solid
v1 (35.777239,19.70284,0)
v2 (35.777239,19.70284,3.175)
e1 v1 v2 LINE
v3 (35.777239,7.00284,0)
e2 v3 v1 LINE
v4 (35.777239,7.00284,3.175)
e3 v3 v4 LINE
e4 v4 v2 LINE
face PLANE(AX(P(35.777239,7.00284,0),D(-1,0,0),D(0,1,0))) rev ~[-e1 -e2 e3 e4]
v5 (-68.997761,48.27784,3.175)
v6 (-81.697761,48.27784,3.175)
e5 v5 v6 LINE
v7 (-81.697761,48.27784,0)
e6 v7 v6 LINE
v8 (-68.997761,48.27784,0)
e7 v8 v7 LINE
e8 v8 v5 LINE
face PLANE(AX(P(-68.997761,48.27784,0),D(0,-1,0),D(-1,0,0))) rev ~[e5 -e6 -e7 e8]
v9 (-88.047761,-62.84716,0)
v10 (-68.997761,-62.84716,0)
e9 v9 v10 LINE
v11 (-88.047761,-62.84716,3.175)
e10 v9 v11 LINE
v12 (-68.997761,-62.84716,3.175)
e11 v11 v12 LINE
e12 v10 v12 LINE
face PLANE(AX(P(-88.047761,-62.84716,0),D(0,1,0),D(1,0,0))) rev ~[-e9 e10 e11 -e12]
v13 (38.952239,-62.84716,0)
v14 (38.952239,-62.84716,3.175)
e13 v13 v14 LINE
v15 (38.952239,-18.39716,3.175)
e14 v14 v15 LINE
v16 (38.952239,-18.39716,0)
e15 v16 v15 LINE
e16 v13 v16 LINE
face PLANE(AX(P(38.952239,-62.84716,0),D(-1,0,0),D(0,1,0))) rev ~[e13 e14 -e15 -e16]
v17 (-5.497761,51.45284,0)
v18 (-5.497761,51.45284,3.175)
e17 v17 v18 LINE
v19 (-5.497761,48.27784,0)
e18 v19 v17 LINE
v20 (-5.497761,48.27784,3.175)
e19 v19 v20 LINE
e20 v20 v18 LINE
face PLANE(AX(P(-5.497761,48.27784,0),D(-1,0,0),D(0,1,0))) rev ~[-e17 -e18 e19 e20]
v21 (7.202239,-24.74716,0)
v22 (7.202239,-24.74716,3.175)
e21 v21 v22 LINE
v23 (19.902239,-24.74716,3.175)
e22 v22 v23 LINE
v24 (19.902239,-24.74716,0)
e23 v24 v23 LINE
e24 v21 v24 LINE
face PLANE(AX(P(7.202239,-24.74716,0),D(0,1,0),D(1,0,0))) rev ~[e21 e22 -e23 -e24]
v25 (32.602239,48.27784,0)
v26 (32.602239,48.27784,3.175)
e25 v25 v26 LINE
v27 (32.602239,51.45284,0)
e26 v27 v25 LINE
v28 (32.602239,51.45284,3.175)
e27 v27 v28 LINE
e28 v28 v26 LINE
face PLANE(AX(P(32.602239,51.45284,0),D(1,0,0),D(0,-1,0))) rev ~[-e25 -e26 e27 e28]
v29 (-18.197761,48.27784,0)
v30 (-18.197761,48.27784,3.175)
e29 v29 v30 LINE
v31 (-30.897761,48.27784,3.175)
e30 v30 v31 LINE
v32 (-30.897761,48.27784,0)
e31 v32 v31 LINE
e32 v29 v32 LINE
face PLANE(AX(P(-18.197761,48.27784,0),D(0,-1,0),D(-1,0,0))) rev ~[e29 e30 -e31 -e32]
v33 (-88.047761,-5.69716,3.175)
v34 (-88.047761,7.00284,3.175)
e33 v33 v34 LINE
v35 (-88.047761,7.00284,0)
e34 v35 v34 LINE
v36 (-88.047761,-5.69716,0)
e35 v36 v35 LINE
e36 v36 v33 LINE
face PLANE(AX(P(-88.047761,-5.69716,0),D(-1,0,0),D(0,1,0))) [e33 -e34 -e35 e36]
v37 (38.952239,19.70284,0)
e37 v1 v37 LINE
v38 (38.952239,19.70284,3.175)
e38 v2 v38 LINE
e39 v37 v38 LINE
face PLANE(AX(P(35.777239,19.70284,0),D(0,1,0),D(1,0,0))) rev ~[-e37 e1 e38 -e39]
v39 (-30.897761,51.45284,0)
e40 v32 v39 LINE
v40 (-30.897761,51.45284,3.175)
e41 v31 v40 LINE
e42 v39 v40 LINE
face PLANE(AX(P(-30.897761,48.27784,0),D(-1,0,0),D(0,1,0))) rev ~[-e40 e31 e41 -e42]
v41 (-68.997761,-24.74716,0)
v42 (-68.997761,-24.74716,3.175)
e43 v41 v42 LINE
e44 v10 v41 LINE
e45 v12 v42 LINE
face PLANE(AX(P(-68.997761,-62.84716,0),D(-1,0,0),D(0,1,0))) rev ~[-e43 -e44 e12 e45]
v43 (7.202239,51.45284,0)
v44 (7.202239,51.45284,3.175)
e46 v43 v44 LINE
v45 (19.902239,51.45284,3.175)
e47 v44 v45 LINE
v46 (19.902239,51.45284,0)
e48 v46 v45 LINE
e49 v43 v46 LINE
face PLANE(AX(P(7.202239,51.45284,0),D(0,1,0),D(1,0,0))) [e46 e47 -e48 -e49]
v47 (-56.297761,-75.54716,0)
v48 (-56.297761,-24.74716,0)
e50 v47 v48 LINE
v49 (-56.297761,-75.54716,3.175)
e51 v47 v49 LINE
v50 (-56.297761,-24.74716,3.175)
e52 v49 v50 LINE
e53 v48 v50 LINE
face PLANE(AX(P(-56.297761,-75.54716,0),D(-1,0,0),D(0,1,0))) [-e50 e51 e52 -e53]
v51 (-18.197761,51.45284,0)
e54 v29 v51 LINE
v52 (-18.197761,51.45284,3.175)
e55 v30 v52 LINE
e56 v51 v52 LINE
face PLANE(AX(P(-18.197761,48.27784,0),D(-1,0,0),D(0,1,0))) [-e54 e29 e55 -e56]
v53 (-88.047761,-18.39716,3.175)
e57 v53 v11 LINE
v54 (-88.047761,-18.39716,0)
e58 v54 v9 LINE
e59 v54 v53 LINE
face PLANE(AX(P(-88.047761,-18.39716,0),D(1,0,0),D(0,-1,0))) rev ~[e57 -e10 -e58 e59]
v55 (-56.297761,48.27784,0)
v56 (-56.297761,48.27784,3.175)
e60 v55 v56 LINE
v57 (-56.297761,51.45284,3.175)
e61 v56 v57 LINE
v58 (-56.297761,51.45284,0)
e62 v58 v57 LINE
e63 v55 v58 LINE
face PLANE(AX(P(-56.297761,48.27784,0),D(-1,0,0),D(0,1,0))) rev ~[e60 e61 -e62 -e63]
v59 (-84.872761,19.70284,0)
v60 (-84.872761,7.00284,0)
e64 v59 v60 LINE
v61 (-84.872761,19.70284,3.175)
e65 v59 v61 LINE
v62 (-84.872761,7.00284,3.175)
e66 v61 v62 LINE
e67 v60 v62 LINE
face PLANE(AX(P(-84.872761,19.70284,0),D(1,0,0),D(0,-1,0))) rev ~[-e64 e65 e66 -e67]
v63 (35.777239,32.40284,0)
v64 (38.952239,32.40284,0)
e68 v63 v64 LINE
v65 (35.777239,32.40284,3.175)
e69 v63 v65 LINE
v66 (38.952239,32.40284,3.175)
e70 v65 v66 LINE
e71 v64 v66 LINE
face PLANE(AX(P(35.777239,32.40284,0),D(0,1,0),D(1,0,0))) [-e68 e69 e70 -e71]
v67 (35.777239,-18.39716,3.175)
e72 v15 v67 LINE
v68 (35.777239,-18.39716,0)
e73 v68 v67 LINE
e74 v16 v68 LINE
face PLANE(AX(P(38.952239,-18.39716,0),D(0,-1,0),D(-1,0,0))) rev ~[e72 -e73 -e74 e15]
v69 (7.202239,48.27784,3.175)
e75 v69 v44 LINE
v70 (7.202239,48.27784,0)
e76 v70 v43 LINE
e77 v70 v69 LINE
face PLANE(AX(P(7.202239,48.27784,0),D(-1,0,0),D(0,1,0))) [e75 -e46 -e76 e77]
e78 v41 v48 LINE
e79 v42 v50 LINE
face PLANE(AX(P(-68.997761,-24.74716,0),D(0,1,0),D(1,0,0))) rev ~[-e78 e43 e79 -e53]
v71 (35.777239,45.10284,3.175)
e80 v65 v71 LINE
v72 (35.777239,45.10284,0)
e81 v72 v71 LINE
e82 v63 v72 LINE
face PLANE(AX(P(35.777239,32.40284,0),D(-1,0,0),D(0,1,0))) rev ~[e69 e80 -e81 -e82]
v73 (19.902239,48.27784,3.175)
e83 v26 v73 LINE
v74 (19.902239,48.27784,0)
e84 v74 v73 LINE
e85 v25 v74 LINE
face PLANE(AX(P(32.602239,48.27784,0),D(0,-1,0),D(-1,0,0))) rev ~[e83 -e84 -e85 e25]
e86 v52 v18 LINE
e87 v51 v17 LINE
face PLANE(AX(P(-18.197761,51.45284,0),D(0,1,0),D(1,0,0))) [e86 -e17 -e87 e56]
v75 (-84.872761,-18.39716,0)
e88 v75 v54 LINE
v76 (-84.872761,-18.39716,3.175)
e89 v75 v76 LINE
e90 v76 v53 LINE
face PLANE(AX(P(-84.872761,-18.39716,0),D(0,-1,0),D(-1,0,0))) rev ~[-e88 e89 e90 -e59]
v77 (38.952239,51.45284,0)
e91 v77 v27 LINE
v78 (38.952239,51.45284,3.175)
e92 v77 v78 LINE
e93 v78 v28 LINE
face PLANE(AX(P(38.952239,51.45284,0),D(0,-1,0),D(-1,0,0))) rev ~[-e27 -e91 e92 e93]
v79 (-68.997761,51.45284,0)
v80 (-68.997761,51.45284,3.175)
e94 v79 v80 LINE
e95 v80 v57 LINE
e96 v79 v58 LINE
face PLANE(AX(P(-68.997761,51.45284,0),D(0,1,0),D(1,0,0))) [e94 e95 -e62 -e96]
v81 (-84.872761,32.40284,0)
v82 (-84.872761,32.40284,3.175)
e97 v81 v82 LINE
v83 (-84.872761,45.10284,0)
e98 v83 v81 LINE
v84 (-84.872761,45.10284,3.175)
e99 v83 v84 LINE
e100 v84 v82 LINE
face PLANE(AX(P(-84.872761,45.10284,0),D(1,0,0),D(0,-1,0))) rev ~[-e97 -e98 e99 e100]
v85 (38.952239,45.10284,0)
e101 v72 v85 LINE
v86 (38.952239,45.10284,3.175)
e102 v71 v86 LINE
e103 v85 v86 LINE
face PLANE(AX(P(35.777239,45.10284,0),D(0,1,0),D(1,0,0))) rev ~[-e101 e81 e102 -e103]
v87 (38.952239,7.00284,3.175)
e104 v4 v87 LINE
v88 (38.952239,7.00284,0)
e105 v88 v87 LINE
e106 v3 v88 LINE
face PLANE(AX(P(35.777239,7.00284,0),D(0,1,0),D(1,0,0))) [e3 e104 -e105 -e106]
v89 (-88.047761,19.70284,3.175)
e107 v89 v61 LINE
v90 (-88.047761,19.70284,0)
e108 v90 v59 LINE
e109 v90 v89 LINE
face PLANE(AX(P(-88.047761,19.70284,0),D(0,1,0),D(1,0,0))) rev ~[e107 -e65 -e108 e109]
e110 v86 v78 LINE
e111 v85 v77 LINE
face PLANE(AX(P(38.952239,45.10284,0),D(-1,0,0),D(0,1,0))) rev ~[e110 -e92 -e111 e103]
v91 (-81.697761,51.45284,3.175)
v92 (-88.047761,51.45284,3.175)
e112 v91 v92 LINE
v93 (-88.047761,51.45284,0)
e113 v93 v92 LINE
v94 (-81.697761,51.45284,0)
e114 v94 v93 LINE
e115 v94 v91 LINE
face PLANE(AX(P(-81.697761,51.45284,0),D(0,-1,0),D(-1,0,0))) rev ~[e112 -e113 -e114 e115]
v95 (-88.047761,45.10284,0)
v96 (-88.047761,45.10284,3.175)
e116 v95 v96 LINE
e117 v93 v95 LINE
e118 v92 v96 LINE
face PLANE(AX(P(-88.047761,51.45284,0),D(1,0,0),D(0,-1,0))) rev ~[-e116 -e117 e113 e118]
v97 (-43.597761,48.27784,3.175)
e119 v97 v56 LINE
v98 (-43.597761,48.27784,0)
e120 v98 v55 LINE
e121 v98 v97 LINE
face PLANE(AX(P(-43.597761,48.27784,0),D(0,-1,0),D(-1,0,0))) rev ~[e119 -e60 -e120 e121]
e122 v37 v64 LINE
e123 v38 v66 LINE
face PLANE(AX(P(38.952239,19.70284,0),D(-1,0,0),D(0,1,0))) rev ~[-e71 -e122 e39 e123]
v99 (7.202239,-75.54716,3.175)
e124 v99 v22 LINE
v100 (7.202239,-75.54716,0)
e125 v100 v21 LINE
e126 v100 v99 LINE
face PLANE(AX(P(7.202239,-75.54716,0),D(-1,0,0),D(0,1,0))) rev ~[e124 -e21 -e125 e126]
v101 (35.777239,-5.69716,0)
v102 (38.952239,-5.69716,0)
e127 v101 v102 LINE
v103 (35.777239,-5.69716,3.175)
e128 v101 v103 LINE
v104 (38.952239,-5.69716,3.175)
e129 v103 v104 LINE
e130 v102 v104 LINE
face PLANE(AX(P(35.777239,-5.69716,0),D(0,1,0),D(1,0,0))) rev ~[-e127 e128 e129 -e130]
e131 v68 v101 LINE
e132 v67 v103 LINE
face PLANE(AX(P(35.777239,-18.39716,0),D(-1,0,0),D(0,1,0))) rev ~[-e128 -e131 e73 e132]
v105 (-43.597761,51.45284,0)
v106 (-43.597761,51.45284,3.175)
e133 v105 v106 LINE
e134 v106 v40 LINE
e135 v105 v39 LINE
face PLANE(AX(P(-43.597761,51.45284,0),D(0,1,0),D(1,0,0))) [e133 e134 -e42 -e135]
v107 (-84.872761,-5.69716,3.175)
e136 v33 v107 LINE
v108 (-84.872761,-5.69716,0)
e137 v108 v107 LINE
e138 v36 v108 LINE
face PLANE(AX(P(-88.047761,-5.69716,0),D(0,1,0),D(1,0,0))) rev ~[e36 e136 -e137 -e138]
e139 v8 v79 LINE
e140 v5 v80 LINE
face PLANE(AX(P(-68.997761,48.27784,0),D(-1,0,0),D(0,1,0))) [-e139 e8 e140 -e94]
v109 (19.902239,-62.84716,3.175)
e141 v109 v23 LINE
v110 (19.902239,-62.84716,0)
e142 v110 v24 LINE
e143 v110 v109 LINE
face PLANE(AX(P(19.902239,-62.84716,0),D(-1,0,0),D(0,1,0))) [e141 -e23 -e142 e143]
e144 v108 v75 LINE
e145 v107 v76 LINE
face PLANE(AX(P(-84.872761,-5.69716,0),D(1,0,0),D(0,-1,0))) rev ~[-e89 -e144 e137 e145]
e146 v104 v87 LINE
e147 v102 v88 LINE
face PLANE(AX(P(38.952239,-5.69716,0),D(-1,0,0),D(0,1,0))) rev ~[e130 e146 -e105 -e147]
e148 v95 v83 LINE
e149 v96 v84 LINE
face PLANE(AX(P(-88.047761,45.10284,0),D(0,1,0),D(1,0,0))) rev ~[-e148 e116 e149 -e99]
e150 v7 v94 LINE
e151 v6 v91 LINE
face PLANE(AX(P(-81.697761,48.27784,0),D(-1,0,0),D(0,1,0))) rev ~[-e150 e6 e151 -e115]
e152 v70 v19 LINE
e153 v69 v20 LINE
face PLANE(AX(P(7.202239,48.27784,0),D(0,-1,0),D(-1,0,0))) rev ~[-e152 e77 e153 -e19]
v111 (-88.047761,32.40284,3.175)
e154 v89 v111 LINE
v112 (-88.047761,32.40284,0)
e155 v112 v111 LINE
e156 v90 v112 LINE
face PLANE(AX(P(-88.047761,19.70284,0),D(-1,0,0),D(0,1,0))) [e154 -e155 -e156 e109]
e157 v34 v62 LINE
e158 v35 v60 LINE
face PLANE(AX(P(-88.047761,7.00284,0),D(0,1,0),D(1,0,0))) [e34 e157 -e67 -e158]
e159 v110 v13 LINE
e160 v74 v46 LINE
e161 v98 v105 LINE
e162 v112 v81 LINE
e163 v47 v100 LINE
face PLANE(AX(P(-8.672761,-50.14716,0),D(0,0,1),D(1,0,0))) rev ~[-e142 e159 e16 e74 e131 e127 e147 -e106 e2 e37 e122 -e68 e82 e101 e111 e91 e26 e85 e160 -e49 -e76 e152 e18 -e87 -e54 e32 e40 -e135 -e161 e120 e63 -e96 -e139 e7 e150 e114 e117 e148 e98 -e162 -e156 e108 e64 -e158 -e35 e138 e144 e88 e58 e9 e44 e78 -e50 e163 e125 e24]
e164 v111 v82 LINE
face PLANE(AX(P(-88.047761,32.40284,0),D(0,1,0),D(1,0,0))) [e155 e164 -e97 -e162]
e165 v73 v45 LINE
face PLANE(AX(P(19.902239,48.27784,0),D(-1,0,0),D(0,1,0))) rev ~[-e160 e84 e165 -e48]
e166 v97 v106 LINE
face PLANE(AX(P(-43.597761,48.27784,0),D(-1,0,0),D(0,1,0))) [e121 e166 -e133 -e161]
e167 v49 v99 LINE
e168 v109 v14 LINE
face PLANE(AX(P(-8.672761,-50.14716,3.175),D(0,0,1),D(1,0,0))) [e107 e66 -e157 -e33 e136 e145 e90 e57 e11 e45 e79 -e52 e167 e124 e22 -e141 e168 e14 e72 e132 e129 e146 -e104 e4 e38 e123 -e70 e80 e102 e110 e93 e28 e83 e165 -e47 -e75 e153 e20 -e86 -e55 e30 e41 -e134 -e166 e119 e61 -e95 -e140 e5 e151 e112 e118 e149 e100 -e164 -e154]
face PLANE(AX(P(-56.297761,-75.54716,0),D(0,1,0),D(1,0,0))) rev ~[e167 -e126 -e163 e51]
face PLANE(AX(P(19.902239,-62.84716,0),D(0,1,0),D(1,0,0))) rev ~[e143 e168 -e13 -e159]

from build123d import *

# Parameters (mm, degrees)
F0_W     = 31.75
F0_H     = 50.8
F0_W_2   = 3.175
F0_H_2   = 12.7
F0_W_3   = 12.7
F0_H_3   = 3.175
F0_W_4   = 19.05
F0_H_4   = 38.1
F1_DEPTH = 3.175


# Not quite as in the source:
# - a feature names something its author has since deleted; it is built from what else it names


with BuildPart() as f1:
    # F0 (on Top) → F1 (new body)
    with BuildSketch(Plane.XY):
        with Locations((-8.6727611423, -50.1471598029)):
            Rectangle(F0_W, F0_H)
        with Locations((-40.4227611423, -50.1471598029)):
            Rectangle(F0_W, F0_H)
        Polygon((-81.6977611423, 51.4528401971), (-88.0477611423, 51.4528401971), (-88.0477611423, 45.1028401971), (-84.8727611423, 45.1028401971), (-84.8727611423, 32.4028401971), (-84.8727611423, 19.7028401971), (-84.8727611423, 7.0028401971), (-84.8727611423, -5.6971598029), (-84.8727611423, -18.3971598029), (-88.0477611423, -18.3971598029), (-88.0477611423, -24.7471598029), (-68.9977611423, -24.7471598029), (-56.2977611423, -24.7471598029), (-24.5477611423, -24.7471598029), (7.2022388577, -24.7471598029), (19.9022388577, -24.7471598029), (38.9522388577, -24.7471598029), (38.9522388577, -18.3971598029), (35.7772388577, -18.3971598029), (35.7772388577, -5.6971598029), (35.7772388577, 7.0028401971), (35.7772388577, 19.7028401971), (35.7772388577, 32.4028401971), (35.7772388577, 45.1028401971), (38.9522388577, 45.1028401971), (38.9522388577, 51.4528401971), (32.6022388577, 51.4528401971), (32.6022388577, 48.2778401971), (19.9022388577, 48.2778401971), (7.2022388577, 48.2778401971), (-5.4977611423, 48.2778401971), (-18.1977611423, 48.2778401971), (-30.8977611423, 48.2778401971), (-43.5977611423, 48.2778401971), (-56.2977611423, 48.2778401971), (-68.9977611423, 48.2778401971), (-81.6977611423, 48.2778401971), align=None)
        with Locations((-86.4602611423, 26.0528401971)):
            Rectangle(F0_W_2, F0_H_2)
        with Locations((-86.4602611423, 0.6528401971)):
            Rectangle(F0_W_2, F0_H_2)
        with Locations((37.3647388577, 0.6528401971)):
            Rectangle(F0_W_2, F0_H_2)
        with Locations((37.3647388577, 26.0528401971)):
            Rectangle(F0_W_2, F0_H_2)
        with Locations((-62.6477611423, 49.8653401971)):
            Rectangle(F0_W_3, F0_H_3)
        with Locations((-11.8477611423, 49.8653401971)):
            Rectangle(F0_W_3, F0_H_3)
        with Locations((-37.2477611423, 49.8653401971)):
            Rectangle(F0_W_3, F0_H_3)
        with Locations((-78.5227611423, -43.7971598029)):
            Rectangle(F0_W_4, F0_H_4)
        with Locations((29.4272388577, -43.7971598029)):
            Rectangle(F0_W_4, F0_H_4)
        with Locations((13.5522388577, 49.8653401971)):
            Rectangle(F0_W_3, F0_H_3)
    extrude(amount=F1_DEPTH)


solid = f1.part
